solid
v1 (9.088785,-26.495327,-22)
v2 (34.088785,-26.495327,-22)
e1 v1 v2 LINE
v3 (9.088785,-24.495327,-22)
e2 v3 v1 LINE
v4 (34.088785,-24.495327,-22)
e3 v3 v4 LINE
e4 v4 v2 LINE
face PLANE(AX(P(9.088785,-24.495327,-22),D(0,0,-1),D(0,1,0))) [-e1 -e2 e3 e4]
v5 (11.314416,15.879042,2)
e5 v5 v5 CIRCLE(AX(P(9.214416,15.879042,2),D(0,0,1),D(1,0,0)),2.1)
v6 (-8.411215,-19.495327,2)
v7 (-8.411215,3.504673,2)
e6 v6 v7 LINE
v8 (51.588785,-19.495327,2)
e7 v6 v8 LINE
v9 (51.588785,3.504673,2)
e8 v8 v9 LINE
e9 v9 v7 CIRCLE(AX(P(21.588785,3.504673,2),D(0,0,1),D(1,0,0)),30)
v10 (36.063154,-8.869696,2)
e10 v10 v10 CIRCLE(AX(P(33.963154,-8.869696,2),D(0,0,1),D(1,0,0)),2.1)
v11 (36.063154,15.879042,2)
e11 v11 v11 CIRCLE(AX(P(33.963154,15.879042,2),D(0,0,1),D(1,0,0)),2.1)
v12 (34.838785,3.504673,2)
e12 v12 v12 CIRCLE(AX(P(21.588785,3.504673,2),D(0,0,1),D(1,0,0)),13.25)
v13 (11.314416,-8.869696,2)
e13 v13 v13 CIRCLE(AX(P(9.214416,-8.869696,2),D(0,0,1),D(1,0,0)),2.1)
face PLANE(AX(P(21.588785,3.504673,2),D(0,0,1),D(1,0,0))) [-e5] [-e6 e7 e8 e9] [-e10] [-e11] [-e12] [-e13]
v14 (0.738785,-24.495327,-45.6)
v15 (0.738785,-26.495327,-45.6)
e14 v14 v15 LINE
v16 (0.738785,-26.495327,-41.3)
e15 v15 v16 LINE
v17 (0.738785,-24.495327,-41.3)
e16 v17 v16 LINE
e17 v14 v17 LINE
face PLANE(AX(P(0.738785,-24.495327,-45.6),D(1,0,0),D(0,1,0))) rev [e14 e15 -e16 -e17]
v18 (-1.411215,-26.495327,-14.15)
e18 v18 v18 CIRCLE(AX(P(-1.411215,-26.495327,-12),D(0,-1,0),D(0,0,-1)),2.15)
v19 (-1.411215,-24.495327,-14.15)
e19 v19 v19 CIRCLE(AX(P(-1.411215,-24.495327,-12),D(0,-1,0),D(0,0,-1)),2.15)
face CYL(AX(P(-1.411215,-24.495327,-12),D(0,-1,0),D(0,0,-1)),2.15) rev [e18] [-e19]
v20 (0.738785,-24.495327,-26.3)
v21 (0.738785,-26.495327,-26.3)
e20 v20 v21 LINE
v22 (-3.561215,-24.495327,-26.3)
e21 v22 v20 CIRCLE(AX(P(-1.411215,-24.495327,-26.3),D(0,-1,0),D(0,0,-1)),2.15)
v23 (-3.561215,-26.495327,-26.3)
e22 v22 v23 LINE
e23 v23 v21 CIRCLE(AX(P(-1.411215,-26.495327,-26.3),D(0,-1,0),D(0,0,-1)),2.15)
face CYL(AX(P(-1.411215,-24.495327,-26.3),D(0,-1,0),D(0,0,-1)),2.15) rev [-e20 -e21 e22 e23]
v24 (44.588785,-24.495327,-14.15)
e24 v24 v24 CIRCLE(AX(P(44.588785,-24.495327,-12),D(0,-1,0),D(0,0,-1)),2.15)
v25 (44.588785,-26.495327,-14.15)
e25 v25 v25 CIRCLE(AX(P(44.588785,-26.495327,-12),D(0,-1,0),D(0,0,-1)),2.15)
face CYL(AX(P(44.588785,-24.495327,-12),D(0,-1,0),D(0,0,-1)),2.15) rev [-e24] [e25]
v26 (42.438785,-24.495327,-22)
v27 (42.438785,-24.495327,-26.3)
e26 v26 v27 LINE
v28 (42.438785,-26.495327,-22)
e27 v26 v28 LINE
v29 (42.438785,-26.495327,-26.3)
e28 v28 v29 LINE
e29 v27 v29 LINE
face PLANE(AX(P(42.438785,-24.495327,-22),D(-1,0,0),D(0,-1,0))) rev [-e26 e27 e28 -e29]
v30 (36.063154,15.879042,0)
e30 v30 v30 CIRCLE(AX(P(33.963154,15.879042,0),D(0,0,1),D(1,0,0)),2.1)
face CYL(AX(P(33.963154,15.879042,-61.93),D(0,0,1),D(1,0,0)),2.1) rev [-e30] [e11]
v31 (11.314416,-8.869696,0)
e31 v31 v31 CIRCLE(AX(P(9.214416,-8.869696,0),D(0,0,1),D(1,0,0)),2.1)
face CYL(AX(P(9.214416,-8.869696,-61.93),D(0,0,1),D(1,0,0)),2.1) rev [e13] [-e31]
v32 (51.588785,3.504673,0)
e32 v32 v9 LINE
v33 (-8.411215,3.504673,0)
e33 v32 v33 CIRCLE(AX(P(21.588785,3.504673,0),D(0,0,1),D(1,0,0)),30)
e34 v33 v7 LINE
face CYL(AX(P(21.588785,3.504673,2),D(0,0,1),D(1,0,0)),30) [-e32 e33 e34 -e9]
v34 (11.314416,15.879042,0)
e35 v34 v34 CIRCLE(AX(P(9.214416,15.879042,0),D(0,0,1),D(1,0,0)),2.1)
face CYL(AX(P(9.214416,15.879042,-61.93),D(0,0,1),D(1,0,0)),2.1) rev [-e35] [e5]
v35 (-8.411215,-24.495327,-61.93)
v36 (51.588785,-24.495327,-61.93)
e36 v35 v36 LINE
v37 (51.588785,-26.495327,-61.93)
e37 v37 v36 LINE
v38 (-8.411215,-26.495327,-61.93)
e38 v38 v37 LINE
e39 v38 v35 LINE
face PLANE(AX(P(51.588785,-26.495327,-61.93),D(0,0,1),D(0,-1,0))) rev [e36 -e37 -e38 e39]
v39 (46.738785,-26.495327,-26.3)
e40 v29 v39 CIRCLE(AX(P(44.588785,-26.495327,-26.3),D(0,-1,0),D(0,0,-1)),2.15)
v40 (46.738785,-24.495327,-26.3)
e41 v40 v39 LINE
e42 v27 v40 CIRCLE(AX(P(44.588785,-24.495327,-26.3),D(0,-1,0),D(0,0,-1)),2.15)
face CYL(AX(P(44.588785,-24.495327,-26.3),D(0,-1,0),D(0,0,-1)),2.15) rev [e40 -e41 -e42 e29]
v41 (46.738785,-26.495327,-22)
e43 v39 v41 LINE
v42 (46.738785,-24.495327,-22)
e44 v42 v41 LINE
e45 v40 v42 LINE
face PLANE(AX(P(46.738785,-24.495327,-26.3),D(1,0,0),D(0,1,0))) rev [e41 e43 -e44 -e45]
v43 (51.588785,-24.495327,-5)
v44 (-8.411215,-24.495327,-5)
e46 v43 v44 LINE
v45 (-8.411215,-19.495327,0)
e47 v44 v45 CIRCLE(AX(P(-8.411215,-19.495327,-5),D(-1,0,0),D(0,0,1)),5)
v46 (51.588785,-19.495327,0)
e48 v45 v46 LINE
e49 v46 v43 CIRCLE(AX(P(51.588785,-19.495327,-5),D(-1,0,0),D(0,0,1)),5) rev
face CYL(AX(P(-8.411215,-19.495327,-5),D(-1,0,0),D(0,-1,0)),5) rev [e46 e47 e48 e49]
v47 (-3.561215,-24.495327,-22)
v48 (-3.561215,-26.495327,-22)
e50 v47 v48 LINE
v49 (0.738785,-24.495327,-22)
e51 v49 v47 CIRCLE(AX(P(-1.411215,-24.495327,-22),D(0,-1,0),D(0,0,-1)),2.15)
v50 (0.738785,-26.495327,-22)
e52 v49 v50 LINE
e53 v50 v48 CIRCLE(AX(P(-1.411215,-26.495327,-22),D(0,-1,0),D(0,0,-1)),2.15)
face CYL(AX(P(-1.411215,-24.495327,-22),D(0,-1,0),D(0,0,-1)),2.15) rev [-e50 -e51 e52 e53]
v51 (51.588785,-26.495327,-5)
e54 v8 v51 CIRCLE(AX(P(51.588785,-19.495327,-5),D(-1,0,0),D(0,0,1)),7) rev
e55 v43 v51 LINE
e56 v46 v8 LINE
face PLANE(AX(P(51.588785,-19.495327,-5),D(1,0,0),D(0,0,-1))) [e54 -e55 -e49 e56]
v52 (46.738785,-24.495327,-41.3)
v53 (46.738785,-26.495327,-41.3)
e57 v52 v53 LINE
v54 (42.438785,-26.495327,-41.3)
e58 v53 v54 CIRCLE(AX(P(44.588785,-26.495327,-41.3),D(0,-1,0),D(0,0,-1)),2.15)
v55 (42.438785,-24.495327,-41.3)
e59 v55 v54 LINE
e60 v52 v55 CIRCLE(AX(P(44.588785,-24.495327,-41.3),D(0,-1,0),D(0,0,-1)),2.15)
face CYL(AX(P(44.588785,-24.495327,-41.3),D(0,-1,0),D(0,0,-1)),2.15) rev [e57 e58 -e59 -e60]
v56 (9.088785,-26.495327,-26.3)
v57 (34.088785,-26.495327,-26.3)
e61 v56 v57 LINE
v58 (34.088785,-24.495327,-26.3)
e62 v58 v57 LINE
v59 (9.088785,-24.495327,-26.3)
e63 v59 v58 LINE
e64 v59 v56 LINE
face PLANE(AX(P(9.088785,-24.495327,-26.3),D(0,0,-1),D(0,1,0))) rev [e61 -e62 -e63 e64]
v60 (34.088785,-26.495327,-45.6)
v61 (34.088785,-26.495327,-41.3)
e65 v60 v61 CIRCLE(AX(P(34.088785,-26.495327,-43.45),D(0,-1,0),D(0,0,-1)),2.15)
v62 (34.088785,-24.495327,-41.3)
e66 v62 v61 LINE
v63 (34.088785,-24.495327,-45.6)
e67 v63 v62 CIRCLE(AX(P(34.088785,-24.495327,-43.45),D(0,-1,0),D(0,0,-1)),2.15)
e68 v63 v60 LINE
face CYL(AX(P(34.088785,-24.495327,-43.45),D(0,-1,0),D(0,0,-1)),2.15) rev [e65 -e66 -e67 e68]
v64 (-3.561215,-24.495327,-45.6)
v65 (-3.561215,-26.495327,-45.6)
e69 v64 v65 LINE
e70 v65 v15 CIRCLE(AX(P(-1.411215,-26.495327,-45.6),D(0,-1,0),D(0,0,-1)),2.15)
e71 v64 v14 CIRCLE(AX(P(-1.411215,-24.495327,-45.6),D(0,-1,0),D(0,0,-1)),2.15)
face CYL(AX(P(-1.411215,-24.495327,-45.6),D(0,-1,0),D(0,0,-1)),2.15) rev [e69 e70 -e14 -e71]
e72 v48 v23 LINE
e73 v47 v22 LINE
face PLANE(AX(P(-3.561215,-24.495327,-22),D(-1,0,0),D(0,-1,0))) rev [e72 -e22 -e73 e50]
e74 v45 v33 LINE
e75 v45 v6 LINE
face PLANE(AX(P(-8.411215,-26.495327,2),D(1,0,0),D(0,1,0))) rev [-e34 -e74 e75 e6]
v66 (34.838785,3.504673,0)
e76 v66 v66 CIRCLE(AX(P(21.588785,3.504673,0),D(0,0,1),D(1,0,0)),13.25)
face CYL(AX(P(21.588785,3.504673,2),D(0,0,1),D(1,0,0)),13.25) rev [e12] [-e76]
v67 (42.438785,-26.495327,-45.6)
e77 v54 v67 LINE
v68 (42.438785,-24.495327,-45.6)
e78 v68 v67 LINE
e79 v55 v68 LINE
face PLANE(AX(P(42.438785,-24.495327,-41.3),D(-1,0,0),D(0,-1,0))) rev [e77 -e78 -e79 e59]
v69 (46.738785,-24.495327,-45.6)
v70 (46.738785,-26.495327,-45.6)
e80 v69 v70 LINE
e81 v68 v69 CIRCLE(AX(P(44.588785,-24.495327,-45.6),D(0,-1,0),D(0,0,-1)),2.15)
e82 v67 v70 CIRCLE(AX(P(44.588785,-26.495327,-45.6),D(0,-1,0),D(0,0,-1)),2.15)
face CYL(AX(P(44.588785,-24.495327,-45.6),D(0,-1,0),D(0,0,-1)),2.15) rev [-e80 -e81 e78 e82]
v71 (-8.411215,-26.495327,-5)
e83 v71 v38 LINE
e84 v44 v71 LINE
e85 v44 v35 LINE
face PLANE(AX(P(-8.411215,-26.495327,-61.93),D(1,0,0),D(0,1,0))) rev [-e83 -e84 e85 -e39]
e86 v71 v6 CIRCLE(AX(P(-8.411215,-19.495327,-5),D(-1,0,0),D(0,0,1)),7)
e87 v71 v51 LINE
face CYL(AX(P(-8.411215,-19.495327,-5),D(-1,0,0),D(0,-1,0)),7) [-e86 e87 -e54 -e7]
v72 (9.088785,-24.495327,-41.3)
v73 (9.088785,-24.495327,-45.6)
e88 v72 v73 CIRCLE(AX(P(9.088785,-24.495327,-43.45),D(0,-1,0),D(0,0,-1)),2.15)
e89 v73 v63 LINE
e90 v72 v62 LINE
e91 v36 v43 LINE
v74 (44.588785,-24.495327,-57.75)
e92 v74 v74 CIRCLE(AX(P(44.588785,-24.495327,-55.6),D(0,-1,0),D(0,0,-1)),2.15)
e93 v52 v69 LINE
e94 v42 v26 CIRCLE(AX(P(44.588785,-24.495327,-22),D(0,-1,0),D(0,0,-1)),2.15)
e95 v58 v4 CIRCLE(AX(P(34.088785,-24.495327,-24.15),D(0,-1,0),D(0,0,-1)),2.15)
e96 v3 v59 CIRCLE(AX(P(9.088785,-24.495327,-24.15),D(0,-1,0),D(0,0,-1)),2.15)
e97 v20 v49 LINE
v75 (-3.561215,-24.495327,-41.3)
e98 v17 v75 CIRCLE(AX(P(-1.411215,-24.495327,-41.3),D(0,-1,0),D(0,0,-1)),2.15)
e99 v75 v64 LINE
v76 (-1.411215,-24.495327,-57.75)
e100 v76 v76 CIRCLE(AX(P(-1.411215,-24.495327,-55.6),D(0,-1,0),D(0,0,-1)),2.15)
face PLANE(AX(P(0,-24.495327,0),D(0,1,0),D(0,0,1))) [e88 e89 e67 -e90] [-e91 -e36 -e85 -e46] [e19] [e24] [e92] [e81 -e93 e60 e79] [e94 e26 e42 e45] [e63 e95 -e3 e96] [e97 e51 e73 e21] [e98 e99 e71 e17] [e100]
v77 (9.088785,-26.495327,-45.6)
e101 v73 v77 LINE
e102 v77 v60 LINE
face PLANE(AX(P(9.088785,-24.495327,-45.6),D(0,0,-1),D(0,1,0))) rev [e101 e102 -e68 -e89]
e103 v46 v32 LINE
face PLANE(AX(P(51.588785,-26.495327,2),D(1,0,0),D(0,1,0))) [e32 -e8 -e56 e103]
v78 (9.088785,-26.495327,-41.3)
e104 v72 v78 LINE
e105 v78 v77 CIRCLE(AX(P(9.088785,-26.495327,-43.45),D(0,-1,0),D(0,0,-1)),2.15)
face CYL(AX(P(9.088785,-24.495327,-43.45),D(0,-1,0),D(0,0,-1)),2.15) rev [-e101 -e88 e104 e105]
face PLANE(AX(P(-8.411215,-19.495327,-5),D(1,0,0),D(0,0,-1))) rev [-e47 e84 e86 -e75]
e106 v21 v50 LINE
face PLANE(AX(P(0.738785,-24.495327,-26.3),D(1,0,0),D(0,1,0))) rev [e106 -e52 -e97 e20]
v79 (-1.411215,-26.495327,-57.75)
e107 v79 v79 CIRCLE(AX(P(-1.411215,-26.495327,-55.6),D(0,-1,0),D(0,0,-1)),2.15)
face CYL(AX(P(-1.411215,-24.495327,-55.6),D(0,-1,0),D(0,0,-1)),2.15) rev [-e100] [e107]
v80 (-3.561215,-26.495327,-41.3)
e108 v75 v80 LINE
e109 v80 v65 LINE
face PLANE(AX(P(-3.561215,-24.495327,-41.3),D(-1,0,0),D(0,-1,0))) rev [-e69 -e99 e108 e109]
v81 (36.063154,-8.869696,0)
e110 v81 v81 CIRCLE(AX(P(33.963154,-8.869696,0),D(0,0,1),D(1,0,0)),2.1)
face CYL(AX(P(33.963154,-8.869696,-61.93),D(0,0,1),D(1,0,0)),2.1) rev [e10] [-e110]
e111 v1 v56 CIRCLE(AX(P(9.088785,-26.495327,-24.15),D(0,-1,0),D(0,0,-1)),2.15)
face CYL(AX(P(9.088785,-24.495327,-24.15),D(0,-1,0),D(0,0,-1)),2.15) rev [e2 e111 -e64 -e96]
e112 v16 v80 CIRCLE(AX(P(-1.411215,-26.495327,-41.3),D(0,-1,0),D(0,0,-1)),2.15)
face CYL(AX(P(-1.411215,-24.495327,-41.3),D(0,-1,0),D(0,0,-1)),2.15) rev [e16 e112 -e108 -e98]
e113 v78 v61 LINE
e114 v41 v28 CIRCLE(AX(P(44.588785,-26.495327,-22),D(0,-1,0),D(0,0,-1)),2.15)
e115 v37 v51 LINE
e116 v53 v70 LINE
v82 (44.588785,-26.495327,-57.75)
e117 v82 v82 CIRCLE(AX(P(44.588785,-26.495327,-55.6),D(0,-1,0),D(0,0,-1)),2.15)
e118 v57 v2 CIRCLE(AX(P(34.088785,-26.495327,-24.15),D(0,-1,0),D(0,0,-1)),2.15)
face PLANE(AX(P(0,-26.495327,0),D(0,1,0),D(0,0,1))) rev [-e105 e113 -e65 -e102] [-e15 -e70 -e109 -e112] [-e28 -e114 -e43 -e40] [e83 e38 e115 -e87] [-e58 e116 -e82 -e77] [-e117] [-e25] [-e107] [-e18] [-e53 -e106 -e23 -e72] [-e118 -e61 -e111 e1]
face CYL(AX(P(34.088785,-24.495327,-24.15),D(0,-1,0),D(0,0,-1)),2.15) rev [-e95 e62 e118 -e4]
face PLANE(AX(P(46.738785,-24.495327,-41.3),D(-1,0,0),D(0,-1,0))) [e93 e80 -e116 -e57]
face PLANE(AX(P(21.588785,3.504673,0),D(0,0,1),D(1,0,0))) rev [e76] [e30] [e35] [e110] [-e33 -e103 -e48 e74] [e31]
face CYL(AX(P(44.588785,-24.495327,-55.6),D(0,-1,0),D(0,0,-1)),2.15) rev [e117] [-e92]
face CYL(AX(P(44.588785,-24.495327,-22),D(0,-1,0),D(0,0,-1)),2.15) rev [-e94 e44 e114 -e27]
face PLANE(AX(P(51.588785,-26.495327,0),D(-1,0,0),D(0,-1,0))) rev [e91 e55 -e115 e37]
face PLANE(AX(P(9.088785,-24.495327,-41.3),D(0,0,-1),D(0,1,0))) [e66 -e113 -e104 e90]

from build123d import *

# Parameters (mm, degrees)
BOSS_EXTRUDE2_DEPTH          = 2
SKETCH2_R                    = 13.25
CUT_EXTRUDE1_DEPTH           = 62.54645277
EDGE_FLANGE1_STRIP_W         = 18
EDGE_FLANGE1_STRIP_H         = 2
EDGE_FLANGE1_STRIP_CUT_DEPTH = 60
EDGE_FLANGE1_DEPTH           = 60
SKETCH12_R                   = 2.1
CUT_EXTRUDE2_DEPTH           = 89.718717014
SKETCH13_R                   = 2.15
CUT_EXTRUDE3_DEPTH           = 2


# Sheet-metal steps are written as plain solids
with BuildPart() as part:
    # Sketch1 → Boss-Extrude2 (new body)
    with BuildSketch(Plane.XY):
        with BuildLine():
            Line((51.588785047, -26.495327103), (-8.411214953, -26.495327103))
            Line((-8.411214953, -26.495327103), (-8.411214953, 3.504672897))
            ThreePointArc((-8.411214953, 3.504672897), (21.588785047, 33.504672897), (51.588785047, 3.504672897))
            Line((51.588785047, 3.504672897), (51.588785047, -26.495327103))
        make_face()
    extrude(amount=BOSS_EXTRUDE2_DEPTH)

    # Sketch2 → Cut-Extrude1 (cut, through all)
    with BuildSketch(Plane.XY.offset(2)):
        with Locations((21.588785047, 3.504672897)):
            Circle(SKETCH2_R)
    extrude(amount=-CUT_EXTRUDE1_DEPTH, mode=Mode.SUBTRACT)

    # Edge-Flange1 strip (across the edge) → Edge-Flange1 strip cut (cut)
    with BuildSketch(Plane(origin=(51.588785047, -26.495327103, 0), x_dir=(0, 1, 0), z_dir=(-1, 0, 0))):
        with Locations((-2, -1)):
            Rectangle(EDGE_FLANGE1_STRIP_W, EDGE_FLANGE1_STRIP_H)
    extrude(amount=EDGE_FLANGE1_STRIP_CUT_DEPTH, mode=Mode.SUBTRACT)

    # Edge-Flange1 section (across the edge) → Edge-Flange1 (add)
    with BuildSketch(Plane(origin=(51.588785047, -26.495327103, 0), x_dir=(0, 1, 0), z_dir=(-1, 0, 0))):
        with BuildLine():
            Line((0, 5), (0, 61.93))
            Line((0, 61.93), (2, 61.93))
            Line((2, 61.93), (2, 5))
            ThreePointArc((2, 5), (3.464466094, 1.464466094), (7, 0))
            Line((7, 0), (7, -2))
            ThreePointArc((7, -2), (2.050252532, 0.050252532), (0, 5))
        make_face()
    extrude(amount=EDGE_FLANGE1_DEPTH)

    # Sketch12 → Cut-Extrude2 (cut, through all)
    with BuildSketch(Plane.XY.offset(2)):
        with Locations((33.963153717, 15.879041568)):
            Circle(SKETCH12_R)
        with Locations((33.963153717, -8.869695774)):
            Circle(SKETCH12_R)
        with Locations((9.214416376, -8.869695774)):
            Circle(SKETCH12_R)
        with Locations((9.214416376, 15.879041568)):
            Circle(SKETCH12_R)
    extrude(amount=-CUT_EXTRUDE2_DEPTH, mode=Mode.SUBTRACT)

    # Sketch13 → Cut-Extrude3 (cut)
    with BuildSketch(Plane.XZ.offset(26.495327103)):
        with Locations(Location((-1.411214953, -12, 0), (0, 0, 270))):
            Circle(SKETCH13_R)
        with Locations(Location((44.588785047, -12, 0), (0, 0, 270))):
            Circle(SKETCH13_R)
        with Locations(Location((44.588785047, -55.6, 0), (0, 0, 270))):
            Circle(SKETCH13_R)
        with Locations(Location((-1.411214953, -55.6, 0), (0, 0, 270))):
            Circle(SKETCH13_R)
        with BuildLine():
            Line((-3.561214953, -41.3), (-3.561214953, -45.6))
            ThreePointArc((-3.561214953, -45.6), (-1.411214953, -47.75), (0.738785047, -45.6))
            Line((0.738785047, -45.6), (0.738785047, -41.3))
            ThreePointArc((0.738785047, -41.3), (-1.411214953, -39.15), (-3.561214953, -41.3))
        make_face()
        with BuildLine():
            Line((-3.561214953, -22), (-3.561214953, -26.3))
            ThreePointArc((-3.561214953, -26.3), (-1.411214953, -28.45), (0.738785047, -26.3))
            Line((0.738785047, -26.3), (0.738785047, -22))
            ThreePointArc((0.738785047, -22), (-1.411214953, -19.85), (-3.561214953, -22))
        make_face()
        with BuildLine():
            Line((46.738785047, -26.3), (46.738785047, -22))
            ThreePointArc((46.738785047, -22), (44.588785047, -19.85), (42.438785047, -22))
            Line((42.438785047, -22), (42.438785047, -26.3))
            ThreePointArc((42.438785047, -26.3), (44.588785047, -28.45), (46.738785047, -26.3))
        make_face()
        with BuildLine():
            Line((42.438785047, -41.3), (42.438785047, -45.6))
            ThreePointArc((42.438785047, -45.6), (44.588785047, -47.75), (46.738785047, -45.6))
            Line((46.738785047, -45.6), (46.738785047, -41.3))
            ThreePointArc((46.738785047, -41.3), (44.588785047, -39.15), (42.438785047, -41.3))
        make_face()
        with BuildLine():
            Line((9.088785047, -22), (34.088785047, -22))
            ThreePointArc((34.088785047, -22), (36.238785047, -24.15), (34.088785047, -26.3))
            Line((34.088785047, -26.3), (9.088785047, -26.3))
            ThreePointArc((9.088785047, -26.3), (6.938785047, -24.15), (9.088785047, -22))
        make_face()
        with BuildLine():
            Line((9.088785047, -41.3), (34.088785047, -41.3))
            ThreePointArc((34.088785047, -41.3), (36.238785047, -43.45), (34.088785047, -45.6))
            Line((34.088785047, -45.6), (9.088785047, -45.6))
            ThreePointArc((9.088785047, -45.6), (6.938785047, -43.45), (9.088785047, -41.3))
        make_face()
    extrude(amount=-CUT_EXTRUDE3_DEPTH, mode=Mode.SUBTRACT)


solid = part.part
